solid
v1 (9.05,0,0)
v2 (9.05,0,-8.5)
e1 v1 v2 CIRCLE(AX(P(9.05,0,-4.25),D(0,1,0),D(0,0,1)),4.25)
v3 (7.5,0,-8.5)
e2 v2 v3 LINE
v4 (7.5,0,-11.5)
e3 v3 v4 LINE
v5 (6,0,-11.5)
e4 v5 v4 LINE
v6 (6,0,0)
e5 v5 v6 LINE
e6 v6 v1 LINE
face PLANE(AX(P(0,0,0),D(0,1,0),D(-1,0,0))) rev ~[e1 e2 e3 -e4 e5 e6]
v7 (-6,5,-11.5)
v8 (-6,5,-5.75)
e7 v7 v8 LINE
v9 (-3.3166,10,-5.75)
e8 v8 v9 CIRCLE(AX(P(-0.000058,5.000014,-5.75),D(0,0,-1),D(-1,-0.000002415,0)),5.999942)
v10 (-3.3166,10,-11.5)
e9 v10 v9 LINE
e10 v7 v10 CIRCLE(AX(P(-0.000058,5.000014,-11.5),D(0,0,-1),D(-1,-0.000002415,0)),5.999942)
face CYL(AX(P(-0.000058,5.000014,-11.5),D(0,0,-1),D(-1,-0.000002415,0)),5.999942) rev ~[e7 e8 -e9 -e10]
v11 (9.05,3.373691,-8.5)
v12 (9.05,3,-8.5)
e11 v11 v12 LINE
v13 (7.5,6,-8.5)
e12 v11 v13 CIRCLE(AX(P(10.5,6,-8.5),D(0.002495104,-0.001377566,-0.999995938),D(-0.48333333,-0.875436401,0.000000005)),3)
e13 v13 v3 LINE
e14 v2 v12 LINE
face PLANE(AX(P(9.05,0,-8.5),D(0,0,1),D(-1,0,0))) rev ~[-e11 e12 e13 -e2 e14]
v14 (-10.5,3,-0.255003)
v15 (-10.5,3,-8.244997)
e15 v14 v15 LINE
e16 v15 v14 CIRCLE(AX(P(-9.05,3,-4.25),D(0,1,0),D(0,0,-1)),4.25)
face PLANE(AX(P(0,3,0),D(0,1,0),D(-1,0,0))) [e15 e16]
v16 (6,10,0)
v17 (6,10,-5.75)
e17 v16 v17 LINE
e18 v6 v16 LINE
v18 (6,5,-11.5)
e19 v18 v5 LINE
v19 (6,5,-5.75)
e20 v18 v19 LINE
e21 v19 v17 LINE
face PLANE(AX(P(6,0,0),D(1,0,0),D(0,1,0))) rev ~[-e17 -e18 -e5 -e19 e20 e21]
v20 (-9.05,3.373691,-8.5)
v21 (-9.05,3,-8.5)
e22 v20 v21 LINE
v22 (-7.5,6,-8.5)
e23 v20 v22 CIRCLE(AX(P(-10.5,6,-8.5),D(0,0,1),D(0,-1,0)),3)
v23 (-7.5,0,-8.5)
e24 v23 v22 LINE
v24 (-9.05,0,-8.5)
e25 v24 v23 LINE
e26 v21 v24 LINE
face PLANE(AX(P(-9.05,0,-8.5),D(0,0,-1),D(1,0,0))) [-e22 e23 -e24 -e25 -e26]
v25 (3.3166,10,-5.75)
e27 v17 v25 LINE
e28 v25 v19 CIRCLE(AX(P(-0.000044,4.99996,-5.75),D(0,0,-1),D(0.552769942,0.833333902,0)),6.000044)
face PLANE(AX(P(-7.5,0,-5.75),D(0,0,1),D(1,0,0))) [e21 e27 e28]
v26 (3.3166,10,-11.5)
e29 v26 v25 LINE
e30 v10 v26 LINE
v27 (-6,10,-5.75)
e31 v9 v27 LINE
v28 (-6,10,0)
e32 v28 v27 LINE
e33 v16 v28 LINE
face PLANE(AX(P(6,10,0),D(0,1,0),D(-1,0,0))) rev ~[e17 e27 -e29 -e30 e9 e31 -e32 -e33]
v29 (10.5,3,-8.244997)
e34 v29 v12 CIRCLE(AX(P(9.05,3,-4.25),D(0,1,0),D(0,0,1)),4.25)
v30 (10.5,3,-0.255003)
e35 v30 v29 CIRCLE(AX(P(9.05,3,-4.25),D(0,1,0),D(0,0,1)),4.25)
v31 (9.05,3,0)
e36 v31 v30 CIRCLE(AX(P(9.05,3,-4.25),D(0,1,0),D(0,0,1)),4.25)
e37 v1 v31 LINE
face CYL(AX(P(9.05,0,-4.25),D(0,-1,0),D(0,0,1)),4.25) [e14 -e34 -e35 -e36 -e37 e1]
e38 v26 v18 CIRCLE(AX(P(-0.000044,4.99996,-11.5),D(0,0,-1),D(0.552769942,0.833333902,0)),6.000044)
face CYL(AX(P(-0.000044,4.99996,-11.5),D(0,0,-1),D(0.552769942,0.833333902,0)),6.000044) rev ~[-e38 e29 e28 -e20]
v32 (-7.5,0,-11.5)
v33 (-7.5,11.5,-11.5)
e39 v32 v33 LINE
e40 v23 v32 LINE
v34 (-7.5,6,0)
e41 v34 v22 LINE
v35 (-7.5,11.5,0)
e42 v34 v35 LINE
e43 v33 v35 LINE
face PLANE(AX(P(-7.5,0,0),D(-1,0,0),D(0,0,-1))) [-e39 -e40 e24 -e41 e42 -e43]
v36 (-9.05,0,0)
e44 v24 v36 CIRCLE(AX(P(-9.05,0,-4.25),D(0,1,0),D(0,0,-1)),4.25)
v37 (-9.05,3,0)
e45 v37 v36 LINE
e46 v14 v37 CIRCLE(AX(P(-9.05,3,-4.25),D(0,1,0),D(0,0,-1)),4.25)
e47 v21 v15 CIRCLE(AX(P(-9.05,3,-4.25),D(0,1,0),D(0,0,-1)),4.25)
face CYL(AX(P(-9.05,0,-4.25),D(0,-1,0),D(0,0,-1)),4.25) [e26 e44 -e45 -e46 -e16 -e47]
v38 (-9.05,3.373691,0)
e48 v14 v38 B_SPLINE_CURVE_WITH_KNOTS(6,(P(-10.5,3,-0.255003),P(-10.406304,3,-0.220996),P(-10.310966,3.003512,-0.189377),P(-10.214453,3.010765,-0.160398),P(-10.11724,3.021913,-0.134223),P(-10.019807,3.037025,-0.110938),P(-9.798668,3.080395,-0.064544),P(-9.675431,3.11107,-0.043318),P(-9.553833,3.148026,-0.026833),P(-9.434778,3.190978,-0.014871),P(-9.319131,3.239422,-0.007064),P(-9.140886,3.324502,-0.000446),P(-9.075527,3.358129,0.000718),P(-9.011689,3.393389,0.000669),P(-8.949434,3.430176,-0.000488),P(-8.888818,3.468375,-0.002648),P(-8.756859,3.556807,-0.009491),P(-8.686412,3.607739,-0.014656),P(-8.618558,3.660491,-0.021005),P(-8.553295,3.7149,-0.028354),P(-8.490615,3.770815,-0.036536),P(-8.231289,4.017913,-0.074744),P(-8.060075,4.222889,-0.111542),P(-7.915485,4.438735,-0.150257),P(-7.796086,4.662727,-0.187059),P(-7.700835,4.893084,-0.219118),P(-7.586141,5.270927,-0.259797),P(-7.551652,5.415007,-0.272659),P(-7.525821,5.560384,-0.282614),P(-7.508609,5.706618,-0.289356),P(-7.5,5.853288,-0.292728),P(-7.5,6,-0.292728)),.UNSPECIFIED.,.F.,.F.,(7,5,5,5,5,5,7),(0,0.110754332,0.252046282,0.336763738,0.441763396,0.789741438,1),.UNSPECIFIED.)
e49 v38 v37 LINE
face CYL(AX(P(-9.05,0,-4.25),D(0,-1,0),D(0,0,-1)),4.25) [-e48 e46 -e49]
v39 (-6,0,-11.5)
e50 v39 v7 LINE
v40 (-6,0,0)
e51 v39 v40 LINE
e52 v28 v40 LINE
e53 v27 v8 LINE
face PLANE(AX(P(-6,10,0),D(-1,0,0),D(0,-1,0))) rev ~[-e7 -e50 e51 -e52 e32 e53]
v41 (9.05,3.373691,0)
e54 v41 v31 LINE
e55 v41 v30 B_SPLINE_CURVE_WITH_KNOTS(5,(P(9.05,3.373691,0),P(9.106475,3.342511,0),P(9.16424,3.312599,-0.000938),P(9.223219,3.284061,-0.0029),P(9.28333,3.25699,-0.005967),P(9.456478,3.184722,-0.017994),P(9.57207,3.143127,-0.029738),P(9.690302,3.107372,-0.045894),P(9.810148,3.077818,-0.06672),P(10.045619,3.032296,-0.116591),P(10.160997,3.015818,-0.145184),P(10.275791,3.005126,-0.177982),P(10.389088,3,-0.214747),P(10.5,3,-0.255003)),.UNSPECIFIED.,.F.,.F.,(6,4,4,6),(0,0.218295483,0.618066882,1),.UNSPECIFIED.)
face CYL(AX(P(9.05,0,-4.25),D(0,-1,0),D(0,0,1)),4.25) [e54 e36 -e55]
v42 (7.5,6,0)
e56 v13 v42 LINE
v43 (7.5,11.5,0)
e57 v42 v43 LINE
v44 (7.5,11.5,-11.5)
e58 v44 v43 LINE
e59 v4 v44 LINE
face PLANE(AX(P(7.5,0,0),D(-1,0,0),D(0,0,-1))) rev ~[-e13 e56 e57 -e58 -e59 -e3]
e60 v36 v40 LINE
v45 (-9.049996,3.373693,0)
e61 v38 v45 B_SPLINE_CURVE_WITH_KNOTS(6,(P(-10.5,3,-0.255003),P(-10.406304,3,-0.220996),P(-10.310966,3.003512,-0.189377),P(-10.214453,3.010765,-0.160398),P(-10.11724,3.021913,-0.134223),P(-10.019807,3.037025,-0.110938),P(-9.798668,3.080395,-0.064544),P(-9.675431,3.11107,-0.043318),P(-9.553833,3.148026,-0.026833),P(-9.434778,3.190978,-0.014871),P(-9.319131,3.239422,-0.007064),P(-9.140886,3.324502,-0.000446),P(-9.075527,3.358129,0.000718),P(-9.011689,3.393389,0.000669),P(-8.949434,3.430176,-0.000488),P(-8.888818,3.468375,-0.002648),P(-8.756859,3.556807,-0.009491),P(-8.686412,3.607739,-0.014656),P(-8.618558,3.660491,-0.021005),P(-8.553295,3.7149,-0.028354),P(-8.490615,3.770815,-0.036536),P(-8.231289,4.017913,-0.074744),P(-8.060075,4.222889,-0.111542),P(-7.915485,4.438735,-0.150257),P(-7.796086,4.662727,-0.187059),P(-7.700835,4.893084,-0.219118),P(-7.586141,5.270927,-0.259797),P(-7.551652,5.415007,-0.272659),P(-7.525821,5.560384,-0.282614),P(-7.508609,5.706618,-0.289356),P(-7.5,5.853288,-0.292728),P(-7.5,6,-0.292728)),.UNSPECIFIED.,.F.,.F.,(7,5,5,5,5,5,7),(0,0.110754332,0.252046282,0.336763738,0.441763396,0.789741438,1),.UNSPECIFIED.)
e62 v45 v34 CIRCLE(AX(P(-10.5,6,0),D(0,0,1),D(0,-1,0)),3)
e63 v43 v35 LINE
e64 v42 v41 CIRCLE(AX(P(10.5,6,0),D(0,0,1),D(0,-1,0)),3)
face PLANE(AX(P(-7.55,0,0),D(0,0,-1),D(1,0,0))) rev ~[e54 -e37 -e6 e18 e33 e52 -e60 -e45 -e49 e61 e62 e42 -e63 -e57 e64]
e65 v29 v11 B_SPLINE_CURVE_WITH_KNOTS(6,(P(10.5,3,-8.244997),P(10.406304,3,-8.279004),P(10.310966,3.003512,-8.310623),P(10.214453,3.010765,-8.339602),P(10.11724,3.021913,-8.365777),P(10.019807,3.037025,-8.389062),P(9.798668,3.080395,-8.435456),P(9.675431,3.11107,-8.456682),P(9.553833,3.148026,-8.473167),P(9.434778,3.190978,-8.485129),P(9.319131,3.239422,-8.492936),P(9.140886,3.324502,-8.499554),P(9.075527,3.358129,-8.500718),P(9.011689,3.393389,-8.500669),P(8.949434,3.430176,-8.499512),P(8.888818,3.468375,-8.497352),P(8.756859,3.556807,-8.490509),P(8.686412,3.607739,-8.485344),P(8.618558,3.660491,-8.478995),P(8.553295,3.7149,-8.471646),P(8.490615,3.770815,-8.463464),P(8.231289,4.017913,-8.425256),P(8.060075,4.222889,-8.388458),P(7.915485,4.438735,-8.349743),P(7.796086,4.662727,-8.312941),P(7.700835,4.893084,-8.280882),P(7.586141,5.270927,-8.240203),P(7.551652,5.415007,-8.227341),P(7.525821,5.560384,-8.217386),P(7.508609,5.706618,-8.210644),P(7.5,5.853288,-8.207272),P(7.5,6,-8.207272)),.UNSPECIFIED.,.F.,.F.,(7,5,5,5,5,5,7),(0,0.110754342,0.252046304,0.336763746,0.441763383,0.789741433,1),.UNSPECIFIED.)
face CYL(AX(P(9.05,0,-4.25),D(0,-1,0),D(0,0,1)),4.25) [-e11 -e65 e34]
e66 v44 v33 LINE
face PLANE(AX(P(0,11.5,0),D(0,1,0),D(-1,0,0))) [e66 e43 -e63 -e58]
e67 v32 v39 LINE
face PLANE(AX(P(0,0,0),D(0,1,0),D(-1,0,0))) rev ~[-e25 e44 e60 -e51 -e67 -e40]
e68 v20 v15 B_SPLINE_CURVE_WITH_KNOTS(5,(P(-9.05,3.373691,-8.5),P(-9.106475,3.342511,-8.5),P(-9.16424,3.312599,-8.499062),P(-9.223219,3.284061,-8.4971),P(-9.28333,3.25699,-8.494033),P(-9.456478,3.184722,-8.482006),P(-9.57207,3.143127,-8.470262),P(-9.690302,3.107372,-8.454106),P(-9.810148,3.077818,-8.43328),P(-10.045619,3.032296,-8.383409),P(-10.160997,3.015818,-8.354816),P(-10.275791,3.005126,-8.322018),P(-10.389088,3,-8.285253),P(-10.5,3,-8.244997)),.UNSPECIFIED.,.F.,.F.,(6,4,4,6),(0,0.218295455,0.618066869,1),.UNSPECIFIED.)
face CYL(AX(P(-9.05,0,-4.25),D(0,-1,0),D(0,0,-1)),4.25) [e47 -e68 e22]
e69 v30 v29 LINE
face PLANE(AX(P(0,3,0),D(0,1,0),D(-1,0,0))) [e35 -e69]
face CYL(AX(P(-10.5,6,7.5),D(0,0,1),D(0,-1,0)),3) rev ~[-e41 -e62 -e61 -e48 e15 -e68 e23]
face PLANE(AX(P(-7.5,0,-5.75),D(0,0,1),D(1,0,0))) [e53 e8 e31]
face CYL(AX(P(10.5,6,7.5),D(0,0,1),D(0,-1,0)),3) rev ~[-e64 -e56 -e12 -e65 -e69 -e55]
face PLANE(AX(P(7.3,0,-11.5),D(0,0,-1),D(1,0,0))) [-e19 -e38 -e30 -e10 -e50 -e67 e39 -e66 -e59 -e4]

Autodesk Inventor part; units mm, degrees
ref_plane "YZ Plane" through (0, 0, 0) normal (1, 0, 0) x (0, 1, 0)
ref_plane "XZ Plane" through (0, 0, 0) normal (0, 1, 0) x (-1, 0, 0)
ref_plane "XY Plane" through (0, 0, 0) normal (0, 0, 1) x (1, 0, 0)
sketch "Sketch1" plane through (0, 0, 0) normal (0, 1, 0) x (-1, 0, 0)
  line L0 (-7.55, 0) -> (0, 0)
  line L1 (0, -11.5) -> (-7.5, -11.5)
  line L2 (-7.5, 0) -> (-9.05, 0)
  line L3 (-9.05, -8.5) -> (0, -8.5)
  arc A0 (-9.05, 0) -> (-9.05, -8.5) centre (-9.05, -4.25) ccw
  line L4 (-7.55, 0) -> (-7.3, 0)
  line L5 (-7.3, -11.5) -> (-7.5, -11.5)
  line L6 (-7.55, 0) -> (-7.5, 0)
  line L7 (-7.5, -11.5) -> (-7.5, -11.5)
  line L8 (0, 0) -> (0, -11.5)
  line L9 (-7.5, 0) -> (-7.5, -8.5)
  line L10 (7.55, 0) -> (0, 0)
  line L11 (0, -11.5) -> (7.55, -11.5)
  line L12 (7.5, 0) -> (9.05, 0)
  line L13 (9.05, -8.5) -> (0, -8.5)
  arc A1 (9.05, -8.5) -> (9.05, 0) centre (9.05, -4.25) ccw
  line L14 (7.55, 0) -> (7.3, 0)
  line L15 (7.3, -11.5) -> (7.55, -11.5)
  line L16 (7.55, 0) -> (7.5, 0)
  line L17 (7.5, -11.5) -> (7.5, -11.5)
  line L18 (7.5, 0) -> (7.5, -11.5)
  line L19 (7.5, 0) -> (-7.5, 0)
  line L20 (-7.5, 0) -> (-7.5, -11.5)
  line L21 (-7.5, -11.5) -> (7.5, -11.5)
  line L22 (7.5, -11.5) -> (7.5, 0)
  line L23 (-7.5, -8.5) -> (-7.5, -11.5)
  point P0 (0, 0)
  point P1 (-7.55, -8.5)
  point P2 (-13.3, -4.25)
  point P3 (7.55, -8.5)
  point P4 (13.3, -4.25)
  point P5 (7.5, -8.5)
  dimension "d3" = 8.5
  dimension "d9" = 5.8
  dimension "d25" = 15
  dimension "d26" = 5.8
  dimension "d27" = 11.5
extrude "Extrusion1" add sketch "Sketch1" along normal blind 11.5 contours L0 L8 L3 L9 | L3 L8 L1 L20 | L10 L18 L13 L8 | L13 L18 L11 L8
sketch "Sketch2" plane through (-7.5, 0, 0) normal (0, 0, 1) x (1, 0, 0)
  line L0 (0, 0) -> (15, 0) projected
  line L1 (1, 0) -> (14, 0)
  line L2 (0, 11.5) -> (15, 11.5) projected
  line L3 (1.5, 0) -> (13.5, 0)
  line L4 (13.5, 0) -> (13.5, 10)
  line L5 (13.5, 10) -> (1.5, 10)
  line L6 (1.5, 10) -> (1.5, 0)
  point P0 (7.5, 0)
  point P1 (14, 10.5)
  point P2 (1, 10.5)
  dimension "d14" = 10.5
  dimension "d28" = 11.5
  dimension "d29" = 12
  dimension "d30" = 10
extrude "Extrusion3" add sketch "Sketch1" along normal blind 3 contours L0 L9 L3 A0 L2
extrude "Extrusion4" add sketch "Sketch1" along normal blind 3 contours L18 L10 L12 A1 L13
fillet "Fillet1" radius 3 1 edges at (-7.5, 3, -4.25)
fillet "Fillet2" radius 3 1 edges at (7.5, 3, -4.25)
extrude "Extrusion5" cut sketch "Sketch2" against normal blind 5.75
sketch "Sketch3" plane through (7.5, 0, -11.5) normal (0, 0, -1) x (-1, 0, 0)
  line L0 (1.5, 0) -> (13.5, 0)
  line L1 (13.5, 0) -> (13.5, 5)
  line L2 (10.8166, 10) -> (4.1834, 10)
  line L3 (1.5, 5) -> (1.5, 0)
  arc A0 (4.1834, 10) -> (1.5, 5) centre (7.5, 5) ccw
  arc A1 (13.5, 5) -> (10.8166, 10) centre (7.5, 5) ccw
  point P0 (7.5, 0)
  point P1 (13.5, 10)
  point P2 (1.5, 10)
  dimension "d33" = 12
  dimension "d34" = 10
extrude "Extrusion6" cut sketch "Sketch3" against normal blind 5.75
sketch "Sketch4" plane through (-7.5, 11.5, 0) normal (0, 0, 1) x (1, 0, 0)
  line L0 (1.5, -1.5) -> (13.5, -1.5) projected
  point P0 (7.5, -11.5)
  dimension "d40" = 10
properties part number "Motor_Bracket"
